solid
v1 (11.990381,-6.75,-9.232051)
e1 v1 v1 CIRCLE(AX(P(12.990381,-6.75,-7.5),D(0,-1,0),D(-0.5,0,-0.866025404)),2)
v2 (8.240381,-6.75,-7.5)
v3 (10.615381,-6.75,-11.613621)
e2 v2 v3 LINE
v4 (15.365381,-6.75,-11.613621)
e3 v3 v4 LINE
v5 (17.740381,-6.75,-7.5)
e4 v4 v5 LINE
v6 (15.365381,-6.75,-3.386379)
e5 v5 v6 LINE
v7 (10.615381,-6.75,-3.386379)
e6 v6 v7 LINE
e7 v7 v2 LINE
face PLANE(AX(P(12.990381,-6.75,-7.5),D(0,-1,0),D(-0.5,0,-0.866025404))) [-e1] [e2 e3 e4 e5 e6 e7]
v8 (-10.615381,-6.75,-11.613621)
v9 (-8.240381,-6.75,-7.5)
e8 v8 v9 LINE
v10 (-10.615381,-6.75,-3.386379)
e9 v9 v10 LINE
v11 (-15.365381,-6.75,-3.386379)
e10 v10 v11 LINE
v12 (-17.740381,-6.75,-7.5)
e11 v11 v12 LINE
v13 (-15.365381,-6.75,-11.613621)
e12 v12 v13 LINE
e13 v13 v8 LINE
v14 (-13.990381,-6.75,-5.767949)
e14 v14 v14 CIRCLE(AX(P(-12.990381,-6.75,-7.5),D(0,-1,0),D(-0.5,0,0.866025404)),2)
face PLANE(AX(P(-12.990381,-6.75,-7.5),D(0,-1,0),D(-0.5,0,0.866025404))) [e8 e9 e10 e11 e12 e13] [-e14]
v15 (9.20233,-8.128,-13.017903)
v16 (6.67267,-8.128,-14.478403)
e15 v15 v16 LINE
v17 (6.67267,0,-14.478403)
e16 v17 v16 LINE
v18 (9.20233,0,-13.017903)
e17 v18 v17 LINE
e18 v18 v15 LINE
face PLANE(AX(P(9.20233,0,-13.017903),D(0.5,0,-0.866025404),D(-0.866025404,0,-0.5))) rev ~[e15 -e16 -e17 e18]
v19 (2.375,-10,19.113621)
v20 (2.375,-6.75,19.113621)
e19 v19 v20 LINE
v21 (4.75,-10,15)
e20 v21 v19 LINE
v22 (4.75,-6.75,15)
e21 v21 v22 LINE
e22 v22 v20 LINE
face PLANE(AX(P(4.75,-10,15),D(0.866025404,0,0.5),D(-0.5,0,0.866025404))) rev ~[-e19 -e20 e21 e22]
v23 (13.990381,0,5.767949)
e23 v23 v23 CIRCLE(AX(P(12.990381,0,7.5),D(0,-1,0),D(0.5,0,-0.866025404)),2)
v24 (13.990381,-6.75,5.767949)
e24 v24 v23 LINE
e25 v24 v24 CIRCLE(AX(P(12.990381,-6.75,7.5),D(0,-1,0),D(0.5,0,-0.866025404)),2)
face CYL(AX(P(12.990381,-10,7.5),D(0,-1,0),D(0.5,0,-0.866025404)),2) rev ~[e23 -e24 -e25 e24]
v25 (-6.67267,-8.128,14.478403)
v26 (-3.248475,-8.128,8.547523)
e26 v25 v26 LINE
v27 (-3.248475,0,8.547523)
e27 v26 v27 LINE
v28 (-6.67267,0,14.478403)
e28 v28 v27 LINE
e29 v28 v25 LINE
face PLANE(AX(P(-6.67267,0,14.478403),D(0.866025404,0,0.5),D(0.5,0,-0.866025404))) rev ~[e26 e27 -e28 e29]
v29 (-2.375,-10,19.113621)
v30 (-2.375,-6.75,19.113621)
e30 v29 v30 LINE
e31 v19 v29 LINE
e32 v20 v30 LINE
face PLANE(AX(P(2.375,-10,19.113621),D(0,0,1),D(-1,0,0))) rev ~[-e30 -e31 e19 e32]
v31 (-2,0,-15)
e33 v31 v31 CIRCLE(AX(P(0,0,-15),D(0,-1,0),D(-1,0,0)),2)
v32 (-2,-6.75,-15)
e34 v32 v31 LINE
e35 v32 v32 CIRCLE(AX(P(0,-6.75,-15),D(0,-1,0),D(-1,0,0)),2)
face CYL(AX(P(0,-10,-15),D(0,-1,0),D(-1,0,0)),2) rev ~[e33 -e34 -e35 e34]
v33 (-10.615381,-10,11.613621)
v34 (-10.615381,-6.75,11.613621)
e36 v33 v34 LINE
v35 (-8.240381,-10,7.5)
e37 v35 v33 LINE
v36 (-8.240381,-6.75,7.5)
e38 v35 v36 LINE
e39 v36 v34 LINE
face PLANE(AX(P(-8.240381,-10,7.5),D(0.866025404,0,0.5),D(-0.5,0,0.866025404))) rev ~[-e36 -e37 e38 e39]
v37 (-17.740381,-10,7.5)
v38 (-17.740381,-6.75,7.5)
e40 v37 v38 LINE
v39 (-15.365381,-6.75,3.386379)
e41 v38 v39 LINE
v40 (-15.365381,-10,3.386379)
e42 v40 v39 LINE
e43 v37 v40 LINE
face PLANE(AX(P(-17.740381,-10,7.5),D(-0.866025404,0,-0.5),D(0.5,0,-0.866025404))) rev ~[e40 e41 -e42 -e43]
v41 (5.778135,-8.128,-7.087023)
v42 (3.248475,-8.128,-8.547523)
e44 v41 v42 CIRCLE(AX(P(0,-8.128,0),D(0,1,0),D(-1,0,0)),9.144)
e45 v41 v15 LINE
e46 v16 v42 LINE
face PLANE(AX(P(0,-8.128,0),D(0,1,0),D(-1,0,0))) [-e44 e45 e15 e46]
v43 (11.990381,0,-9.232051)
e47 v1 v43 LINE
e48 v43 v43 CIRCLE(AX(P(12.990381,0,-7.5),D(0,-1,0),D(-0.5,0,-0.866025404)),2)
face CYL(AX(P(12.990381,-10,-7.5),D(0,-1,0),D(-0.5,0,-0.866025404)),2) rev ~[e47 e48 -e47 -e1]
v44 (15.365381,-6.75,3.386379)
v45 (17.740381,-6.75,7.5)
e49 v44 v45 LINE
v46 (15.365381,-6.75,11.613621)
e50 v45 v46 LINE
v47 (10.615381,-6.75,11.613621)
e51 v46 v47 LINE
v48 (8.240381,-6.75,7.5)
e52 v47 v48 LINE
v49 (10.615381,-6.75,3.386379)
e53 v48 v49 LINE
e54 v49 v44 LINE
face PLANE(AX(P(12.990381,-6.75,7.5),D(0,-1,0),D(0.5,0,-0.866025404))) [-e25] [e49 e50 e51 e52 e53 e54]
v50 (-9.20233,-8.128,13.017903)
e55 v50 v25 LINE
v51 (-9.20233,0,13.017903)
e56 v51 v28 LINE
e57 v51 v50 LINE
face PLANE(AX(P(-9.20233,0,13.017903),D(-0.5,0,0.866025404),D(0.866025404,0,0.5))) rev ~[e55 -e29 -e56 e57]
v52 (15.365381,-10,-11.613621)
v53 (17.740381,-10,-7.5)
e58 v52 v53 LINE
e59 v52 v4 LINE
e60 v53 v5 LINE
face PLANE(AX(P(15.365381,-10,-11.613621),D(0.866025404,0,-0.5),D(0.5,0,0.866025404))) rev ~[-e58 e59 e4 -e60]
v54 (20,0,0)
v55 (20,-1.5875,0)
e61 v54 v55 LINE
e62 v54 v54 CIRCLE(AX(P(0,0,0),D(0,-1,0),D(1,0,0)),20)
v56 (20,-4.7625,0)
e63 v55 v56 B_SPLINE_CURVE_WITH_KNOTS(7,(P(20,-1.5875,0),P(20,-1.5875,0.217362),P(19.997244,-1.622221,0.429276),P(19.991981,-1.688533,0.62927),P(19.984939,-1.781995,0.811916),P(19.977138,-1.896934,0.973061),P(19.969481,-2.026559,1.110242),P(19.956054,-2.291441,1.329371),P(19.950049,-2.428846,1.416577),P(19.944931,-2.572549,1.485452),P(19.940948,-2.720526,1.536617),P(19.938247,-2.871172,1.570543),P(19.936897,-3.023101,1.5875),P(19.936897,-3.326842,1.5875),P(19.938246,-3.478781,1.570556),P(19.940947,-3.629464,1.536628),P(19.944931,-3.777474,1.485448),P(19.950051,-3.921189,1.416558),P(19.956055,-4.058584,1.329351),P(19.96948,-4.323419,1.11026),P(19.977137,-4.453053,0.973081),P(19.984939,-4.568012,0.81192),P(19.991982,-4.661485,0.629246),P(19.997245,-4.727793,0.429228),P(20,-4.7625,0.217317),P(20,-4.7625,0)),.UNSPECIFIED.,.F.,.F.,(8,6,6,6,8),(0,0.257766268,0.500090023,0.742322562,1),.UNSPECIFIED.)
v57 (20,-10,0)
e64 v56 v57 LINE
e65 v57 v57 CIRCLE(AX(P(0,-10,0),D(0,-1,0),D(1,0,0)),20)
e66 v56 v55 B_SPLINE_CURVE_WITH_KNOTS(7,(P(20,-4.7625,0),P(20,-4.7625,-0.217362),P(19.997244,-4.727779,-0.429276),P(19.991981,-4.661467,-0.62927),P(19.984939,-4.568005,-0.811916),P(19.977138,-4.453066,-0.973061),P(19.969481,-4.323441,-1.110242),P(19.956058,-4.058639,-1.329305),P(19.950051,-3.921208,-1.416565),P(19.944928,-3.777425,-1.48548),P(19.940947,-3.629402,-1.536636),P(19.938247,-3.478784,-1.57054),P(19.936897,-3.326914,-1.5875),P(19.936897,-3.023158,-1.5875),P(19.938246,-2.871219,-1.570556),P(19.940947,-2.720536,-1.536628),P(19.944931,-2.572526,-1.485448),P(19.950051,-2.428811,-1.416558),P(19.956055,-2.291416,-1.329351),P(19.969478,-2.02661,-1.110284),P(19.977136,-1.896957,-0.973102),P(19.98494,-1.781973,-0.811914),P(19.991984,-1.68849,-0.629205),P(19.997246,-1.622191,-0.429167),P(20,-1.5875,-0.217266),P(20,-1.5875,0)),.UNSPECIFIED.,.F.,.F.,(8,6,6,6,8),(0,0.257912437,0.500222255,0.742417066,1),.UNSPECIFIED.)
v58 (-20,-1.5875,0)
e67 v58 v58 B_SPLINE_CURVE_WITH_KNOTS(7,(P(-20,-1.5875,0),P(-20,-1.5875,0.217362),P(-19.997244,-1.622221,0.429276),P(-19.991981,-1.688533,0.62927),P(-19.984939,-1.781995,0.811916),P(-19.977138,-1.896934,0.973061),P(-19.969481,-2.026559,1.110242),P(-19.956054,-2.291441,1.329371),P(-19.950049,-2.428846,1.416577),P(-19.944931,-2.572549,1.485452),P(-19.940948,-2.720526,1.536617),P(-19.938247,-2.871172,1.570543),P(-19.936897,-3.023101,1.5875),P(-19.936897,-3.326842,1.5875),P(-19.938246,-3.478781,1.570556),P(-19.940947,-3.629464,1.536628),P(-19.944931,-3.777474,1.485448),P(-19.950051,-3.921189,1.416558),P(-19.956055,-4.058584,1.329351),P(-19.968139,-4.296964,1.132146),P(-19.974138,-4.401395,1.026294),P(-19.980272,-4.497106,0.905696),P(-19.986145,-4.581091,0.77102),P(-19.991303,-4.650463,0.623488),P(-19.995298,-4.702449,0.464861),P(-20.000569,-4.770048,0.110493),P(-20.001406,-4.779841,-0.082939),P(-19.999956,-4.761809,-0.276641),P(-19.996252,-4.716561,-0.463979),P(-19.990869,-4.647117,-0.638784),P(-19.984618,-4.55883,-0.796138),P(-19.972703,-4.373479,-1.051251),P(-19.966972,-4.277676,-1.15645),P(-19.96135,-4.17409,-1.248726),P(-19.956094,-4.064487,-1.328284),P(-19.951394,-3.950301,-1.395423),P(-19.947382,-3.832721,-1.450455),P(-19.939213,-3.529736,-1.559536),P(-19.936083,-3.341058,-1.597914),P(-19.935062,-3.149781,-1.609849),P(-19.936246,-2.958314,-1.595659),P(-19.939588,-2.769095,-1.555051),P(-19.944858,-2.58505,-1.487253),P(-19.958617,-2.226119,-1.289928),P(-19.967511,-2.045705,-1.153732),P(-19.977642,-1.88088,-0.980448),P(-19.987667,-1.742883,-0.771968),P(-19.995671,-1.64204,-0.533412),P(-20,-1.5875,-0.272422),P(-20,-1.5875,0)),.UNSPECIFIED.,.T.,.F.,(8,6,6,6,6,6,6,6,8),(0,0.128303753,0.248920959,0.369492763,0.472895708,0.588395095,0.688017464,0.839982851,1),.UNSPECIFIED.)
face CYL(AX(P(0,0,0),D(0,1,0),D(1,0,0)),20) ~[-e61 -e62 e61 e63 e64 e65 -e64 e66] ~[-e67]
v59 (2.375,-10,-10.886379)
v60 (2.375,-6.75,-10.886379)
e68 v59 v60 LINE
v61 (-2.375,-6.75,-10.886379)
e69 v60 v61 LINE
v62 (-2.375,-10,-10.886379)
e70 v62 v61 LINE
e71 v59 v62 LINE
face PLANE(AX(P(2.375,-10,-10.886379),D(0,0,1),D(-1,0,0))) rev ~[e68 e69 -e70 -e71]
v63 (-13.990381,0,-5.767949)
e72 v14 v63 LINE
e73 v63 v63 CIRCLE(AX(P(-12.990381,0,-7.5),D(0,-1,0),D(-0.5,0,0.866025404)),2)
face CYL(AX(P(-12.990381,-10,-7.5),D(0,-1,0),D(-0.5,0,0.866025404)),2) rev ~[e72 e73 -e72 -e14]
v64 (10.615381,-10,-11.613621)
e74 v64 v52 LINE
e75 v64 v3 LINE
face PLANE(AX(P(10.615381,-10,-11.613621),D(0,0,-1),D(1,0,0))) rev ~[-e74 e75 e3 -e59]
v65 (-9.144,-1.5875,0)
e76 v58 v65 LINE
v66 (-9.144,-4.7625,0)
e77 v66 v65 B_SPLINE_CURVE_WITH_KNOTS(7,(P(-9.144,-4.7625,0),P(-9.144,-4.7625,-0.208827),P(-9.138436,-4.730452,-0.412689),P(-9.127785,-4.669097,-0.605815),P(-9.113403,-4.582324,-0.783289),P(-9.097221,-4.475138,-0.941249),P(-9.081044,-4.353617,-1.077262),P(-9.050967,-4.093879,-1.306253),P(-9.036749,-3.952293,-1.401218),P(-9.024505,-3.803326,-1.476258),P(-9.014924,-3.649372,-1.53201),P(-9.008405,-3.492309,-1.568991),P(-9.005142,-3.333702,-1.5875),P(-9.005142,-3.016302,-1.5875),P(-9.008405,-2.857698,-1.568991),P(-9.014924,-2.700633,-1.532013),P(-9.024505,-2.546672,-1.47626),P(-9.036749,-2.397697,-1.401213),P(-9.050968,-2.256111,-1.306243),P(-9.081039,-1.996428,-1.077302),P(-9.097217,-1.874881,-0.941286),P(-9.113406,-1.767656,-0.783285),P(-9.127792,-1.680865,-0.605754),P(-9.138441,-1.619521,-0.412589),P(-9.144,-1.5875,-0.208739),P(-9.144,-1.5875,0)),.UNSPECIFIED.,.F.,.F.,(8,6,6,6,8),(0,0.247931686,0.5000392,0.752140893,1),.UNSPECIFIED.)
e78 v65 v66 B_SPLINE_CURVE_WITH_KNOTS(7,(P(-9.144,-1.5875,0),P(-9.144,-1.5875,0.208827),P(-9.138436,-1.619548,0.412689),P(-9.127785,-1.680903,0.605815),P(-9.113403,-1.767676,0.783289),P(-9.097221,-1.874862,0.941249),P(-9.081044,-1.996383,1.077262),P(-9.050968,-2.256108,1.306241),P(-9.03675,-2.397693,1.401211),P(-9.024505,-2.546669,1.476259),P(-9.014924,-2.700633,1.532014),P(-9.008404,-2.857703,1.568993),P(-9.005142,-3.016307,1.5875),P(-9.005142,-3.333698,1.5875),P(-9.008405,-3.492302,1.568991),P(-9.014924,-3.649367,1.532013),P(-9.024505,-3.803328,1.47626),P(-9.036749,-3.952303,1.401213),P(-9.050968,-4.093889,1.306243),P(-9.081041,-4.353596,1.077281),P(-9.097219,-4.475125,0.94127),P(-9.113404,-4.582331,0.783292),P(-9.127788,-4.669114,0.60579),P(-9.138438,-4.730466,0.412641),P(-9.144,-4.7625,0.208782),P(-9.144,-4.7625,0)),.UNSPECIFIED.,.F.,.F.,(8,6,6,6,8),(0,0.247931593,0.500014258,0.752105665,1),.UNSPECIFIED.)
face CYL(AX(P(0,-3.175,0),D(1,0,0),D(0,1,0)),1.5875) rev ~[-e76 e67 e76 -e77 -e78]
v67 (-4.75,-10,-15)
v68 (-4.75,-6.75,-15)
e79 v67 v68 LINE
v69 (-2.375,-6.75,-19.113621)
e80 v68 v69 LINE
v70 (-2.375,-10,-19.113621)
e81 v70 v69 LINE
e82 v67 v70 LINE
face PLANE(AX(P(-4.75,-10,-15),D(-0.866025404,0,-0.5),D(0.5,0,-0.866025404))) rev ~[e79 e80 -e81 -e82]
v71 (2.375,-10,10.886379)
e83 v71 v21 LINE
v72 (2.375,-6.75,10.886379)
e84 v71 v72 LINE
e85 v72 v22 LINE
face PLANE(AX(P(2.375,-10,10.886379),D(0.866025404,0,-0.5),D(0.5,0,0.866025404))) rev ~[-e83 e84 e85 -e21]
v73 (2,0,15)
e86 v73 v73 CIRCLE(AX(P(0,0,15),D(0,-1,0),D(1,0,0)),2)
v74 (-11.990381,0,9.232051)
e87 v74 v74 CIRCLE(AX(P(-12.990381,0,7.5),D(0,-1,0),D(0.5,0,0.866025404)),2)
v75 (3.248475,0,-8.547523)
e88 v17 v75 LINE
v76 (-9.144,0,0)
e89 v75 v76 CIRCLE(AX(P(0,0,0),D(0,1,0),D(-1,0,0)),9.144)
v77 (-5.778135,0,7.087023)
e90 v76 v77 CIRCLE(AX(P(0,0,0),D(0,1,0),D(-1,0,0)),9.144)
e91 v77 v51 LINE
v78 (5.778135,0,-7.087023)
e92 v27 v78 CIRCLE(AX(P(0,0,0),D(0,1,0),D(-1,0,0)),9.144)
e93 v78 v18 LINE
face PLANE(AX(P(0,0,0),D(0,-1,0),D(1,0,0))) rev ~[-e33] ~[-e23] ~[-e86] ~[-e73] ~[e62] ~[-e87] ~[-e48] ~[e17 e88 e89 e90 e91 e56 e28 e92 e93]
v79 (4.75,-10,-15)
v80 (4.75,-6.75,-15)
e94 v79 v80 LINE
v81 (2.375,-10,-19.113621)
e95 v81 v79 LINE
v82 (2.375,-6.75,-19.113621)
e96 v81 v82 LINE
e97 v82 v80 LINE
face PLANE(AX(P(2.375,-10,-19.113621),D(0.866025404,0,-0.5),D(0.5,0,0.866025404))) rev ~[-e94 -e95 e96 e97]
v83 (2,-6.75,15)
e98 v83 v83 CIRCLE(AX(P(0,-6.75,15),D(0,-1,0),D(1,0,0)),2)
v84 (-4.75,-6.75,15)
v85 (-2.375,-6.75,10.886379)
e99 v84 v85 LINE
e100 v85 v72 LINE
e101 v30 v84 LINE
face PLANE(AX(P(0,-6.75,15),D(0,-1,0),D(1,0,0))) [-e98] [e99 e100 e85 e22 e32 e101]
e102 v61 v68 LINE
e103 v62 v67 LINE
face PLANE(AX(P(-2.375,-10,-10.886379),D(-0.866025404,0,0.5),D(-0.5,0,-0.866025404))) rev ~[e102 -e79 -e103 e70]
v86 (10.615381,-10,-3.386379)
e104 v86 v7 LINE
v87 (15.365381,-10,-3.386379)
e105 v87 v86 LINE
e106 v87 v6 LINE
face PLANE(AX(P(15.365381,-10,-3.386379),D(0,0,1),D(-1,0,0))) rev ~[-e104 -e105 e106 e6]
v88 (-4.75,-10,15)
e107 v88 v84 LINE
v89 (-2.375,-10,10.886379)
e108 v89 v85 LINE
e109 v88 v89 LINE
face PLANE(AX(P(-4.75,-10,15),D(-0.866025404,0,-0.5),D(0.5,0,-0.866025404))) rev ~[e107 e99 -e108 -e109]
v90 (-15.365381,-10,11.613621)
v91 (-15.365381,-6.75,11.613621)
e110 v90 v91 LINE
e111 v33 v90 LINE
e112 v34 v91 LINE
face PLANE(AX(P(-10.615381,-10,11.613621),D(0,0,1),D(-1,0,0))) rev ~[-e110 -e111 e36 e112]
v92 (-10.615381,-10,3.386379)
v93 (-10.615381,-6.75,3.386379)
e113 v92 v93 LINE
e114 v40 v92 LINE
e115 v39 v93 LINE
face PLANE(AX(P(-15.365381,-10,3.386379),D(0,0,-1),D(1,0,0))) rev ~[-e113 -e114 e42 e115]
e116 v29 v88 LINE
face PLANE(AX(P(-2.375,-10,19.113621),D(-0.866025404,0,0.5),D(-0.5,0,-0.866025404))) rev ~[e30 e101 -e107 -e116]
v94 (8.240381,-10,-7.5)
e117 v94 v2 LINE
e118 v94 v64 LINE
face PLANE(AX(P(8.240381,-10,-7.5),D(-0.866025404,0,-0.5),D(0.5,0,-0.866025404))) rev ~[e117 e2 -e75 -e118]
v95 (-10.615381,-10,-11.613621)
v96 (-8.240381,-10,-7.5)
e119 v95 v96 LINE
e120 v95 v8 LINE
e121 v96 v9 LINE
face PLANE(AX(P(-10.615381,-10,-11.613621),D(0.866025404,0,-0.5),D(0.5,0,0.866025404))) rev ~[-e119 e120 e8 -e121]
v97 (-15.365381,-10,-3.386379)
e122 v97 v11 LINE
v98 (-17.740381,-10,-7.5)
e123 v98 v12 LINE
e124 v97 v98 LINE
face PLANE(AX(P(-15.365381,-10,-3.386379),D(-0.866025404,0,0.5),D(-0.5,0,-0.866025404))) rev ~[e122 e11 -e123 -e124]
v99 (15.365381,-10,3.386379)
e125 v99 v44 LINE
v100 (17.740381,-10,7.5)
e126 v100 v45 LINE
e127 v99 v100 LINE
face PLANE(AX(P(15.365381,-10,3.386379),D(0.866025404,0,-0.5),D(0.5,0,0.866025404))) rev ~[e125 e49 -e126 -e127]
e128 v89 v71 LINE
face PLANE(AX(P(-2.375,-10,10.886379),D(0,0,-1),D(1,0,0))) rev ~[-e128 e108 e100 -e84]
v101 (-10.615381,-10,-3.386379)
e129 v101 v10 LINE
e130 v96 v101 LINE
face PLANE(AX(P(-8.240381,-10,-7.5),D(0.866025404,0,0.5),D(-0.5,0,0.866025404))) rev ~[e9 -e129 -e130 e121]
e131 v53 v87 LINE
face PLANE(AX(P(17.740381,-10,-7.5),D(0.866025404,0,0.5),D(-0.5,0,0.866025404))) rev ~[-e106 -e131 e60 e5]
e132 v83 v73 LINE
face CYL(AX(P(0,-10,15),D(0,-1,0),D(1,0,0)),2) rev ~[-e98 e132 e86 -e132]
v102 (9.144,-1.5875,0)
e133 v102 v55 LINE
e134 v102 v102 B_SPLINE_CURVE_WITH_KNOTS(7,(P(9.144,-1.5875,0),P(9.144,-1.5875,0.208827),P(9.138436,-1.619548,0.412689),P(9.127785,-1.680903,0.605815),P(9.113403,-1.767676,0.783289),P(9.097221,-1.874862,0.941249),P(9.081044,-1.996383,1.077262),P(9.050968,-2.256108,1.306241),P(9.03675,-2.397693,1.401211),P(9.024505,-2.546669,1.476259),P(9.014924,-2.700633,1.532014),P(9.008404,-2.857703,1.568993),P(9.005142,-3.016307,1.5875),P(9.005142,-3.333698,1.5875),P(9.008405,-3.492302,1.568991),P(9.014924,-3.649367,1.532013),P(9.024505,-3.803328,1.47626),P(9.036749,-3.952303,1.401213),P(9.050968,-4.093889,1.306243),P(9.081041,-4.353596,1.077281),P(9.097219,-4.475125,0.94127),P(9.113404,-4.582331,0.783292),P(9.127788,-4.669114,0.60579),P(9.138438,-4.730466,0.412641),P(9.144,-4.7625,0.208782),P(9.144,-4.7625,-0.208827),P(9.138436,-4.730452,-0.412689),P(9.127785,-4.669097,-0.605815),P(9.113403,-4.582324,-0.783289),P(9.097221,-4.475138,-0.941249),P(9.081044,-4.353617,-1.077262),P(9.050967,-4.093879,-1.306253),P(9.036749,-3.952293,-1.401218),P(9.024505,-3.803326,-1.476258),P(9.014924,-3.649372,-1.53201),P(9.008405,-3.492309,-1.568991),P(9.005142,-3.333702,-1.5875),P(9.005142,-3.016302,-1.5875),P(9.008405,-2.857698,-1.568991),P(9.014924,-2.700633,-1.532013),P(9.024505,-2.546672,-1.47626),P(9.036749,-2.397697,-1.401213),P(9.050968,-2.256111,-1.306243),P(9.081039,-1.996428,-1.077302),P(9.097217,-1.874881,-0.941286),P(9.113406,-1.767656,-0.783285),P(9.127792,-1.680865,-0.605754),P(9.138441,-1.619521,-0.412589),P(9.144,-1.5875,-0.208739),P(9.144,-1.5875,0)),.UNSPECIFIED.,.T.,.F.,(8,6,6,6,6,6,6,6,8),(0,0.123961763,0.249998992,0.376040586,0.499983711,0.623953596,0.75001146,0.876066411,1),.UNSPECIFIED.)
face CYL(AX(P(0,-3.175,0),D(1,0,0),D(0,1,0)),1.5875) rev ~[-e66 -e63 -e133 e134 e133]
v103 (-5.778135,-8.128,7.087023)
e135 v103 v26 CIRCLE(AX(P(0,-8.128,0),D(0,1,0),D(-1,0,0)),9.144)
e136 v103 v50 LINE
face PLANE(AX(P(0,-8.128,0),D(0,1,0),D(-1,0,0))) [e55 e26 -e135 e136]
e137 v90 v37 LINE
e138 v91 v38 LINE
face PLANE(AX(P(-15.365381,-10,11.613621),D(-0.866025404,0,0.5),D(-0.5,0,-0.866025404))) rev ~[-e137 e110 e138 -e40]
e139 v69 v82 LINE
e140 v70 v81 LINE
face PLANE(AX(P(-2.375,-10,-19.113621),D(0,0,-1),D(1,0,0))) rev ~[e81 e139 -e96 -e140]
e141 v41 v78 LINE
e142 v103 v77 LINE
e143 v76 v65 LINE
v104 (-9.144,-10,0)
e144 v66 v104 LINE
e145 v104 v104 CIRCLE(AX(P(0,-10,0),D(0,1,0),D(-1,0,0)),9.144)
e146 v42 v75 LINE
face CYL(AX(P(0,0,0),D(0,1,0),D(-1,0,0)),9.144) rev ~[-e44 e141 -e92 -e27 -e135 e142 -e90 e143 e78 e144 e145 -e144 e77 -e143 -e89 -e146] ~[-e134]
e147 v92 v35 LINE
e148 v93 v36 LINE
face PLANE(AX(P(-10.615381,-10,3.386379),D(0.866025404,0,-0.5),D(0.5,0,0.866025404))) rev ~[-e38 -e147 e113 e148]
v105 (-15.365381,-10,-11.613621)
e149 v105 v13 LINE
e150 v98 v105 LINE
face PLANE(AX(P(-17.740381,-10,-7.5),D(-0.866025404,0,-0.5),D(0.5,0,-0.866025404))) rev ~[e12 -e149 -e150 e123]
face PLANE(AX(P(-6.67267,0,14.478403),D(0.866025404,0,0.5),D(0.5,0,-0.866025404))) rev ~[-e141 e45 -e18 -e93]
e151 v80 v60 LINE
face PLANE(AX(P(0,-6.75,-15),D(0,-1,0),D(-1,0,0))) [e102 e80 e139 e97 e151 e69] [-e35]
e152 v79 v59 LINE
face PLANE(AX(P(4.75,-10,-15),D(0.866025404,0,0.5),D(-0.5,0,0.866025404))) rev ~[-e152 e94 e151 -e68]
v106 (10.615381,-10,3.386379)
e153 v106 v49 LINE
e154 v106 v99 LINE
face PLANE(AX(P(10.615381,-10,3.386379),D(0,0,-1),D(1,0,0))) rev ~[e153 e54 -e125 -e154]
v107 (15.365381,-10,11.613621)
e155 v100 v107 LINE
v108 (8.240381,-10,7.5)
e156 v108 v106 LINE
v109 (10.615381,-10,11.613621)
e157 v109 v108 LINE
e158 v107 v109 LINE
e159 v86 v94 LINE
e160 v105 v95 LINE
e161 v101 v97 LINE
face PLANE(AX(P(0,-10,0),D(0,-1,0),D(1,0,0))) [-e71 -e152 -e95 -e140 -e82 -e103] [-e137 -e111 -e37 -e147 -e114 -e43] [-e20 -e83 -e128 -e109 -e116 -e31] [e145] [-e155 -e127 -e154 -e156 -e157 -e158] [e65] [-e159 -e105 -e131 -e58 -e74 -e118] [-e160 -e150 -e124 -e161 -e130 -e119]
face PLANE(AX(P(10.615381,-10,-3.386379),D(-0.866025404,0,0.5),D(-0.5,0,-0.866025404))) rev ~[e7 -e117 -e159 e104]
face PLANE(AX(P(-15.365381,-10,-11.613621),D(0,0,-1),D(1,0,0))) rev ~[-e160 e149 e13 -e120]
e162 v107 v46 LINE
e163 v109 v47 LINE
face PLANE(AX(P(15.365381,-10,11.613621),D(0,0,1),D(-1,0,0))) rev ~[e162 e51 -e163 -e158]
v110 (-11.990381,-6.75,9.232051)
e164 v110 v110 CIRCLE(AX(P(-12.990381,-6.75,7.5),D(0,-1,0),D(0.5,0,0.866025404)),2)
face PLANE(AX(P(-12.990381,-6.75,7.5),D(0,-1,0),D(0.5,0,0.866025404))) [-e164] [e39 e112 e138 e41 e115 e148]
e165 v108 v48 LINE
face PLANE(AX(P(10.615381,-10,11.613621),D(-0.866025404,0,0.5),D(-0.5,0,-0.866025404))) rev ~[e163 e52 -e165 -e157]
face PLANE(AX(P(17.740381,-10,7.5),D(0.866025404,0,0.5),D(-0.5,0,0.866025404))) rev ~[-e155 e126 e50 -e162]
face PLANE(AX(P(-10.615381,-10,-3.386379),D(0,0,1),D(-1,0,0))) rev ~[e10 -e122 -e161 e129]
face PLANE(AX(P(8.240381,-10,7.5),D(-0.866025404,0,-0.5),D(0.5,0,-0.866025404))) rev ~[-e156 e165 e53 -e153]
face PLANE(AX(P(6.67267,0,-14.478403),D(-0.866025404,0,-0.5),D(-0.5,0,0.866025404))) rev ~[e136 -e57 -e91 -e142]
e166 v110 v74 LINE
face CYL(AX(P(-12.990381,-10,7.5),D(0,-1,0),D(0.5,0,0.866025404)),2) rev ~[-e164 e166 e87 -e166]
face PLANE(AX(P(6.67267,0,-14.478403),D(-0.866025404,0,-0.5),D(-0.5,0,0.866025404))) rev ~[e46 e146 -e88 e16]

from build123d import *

# Parameters (mm, degrees)
F0_R            = 20
F1_DEPTH        = 10
F3_DEPTH        = 8.5
F4_R            = 2
F5_DEPTH        = 10.001
F5_COPIES_COUNT = 6
F7_DEPTH        = 3.25
F7_COPIES_COUNT = 6
F8_R            = 5.08
F9_DEPTH        = 10.001
F10_R           = 9.144
F11_DEPTH       = 10.001
F13_DEPTH       = 8.128
F14_R           = 1.5875
F15_DEPTH       = 25.4


# Not quite as in the source:
# - a pattern or mirror of a feature is missing from the dataset's text; its kind, count and spacing are read off the source's solid


with BuildPart() as f1:
    # F0 (on Front) → F1 (new body)
    with BuildSketch(Plane.XZ):
        Circle(F0_R)
    extrude(amount=F1_DEPTH)

    # F2 (on face) → F3 (cut)
    with BuildSketch(Plane(origin=(0, 0, 0), x_dir=(-1, 0, 0), z_dir=(0, 1, 0))):
        Polygon((3.3197640478, 5.75), (-3.3197640478, 5.75), (-6.6395280957, 0), (-3.3197640478, -5.75), (3.3197640478, -5.75), (6.6395280957, 0), align=None)
    extrude(amount=-F3_DEPTH, mode=Mode.SUBTRACT)

    # F4 (on face) → F5 (cut, through all)
    with BuildSketch(Plane.XZ.offset(10)):
        with Locations((0, 15)):
            Circle(F4_R)
    f5 = extrude(amount=-F5_DEPTH, mode=Mode.SUBTRACT)

    # F5_copies: F5 ×6 about axis
    f5_copies_axis = Axis((0, 0, 0), (0, 1, 0))
    for i in range(1, F5_COPIES_COUNT):
        add(f5.rotate(f5_copies_axis, i * 360 / F5_COPIES_COUNT), mode=Mode.SUBTRACT)

    # F6 (on face) → F7 (cut)
    with BuildSketch(Plane.XZ.offset(10)):
        Polygon((2.375, 19.113620668), (-2.375, 19.113620668), (-4.75, 15), (-2.375, 10.886379332), (2.375, 10.886379332), (4.75, 15), align=None)
    f7 = extrude(amount=-F7_DEPTH, mode=Mode.SUBTRACT)

    # F7_copies: F7 ×6 about axis
    f7_copies_axis = Axis((0, 0, 0), (0, 1, 0))
    for i in range(1, F7_COPIES_COUNT):
        add(f7.rotate(f7_copies_axis, i * 360 / F7_COPIES_COUNT), mode=Mode.SUBTRACT)

    # F8 (on face) → F9 (cut, through all)
    with BuildSketch(Plane.XZ.offset(10)):
        Circle(F8_R)
    extrude(amount=-F9_DEPTH, mode=Mode.SUBTRACT)

    # F10 (on face) → F11 (cut, through all)
    with BuildSketch(Plane(origin=(0, 0, 0), x_dir=(-1, 0, 0), z_dir=(0, 1, 0))):
        Circle(F10_R)
    extrude(amount=-F11_DEPTH, mode=Mode.SUBTRACT)

    # F12 (on face) → F13 (cut)
    with BuildSketch(Plane(origin=(0, 0, 0), x_dir=(-1, 0, 0), z_dir=(0, 1, 0))):
        Polygon((9.2023301022, 13.0179032851), (6.6726698978, 14.4784032851), (-9.2023301022, -13.0179032851), (-6.6726698978, -14.4784032851), align=None)
    extrude(amount=-F13_DEPTH, mode=Mode.SUBTRACT)

    # F14 (on Right) → F15 (cut, symmetric)
    with BuildSketch(Plane.YZ):
        with Locations((-3.175, 0)):
            Circle(F14_R)
    extrude(amount=F15_DEPTH, both=True, mode=Mode.SUBTRACT)


solid = f1.part
